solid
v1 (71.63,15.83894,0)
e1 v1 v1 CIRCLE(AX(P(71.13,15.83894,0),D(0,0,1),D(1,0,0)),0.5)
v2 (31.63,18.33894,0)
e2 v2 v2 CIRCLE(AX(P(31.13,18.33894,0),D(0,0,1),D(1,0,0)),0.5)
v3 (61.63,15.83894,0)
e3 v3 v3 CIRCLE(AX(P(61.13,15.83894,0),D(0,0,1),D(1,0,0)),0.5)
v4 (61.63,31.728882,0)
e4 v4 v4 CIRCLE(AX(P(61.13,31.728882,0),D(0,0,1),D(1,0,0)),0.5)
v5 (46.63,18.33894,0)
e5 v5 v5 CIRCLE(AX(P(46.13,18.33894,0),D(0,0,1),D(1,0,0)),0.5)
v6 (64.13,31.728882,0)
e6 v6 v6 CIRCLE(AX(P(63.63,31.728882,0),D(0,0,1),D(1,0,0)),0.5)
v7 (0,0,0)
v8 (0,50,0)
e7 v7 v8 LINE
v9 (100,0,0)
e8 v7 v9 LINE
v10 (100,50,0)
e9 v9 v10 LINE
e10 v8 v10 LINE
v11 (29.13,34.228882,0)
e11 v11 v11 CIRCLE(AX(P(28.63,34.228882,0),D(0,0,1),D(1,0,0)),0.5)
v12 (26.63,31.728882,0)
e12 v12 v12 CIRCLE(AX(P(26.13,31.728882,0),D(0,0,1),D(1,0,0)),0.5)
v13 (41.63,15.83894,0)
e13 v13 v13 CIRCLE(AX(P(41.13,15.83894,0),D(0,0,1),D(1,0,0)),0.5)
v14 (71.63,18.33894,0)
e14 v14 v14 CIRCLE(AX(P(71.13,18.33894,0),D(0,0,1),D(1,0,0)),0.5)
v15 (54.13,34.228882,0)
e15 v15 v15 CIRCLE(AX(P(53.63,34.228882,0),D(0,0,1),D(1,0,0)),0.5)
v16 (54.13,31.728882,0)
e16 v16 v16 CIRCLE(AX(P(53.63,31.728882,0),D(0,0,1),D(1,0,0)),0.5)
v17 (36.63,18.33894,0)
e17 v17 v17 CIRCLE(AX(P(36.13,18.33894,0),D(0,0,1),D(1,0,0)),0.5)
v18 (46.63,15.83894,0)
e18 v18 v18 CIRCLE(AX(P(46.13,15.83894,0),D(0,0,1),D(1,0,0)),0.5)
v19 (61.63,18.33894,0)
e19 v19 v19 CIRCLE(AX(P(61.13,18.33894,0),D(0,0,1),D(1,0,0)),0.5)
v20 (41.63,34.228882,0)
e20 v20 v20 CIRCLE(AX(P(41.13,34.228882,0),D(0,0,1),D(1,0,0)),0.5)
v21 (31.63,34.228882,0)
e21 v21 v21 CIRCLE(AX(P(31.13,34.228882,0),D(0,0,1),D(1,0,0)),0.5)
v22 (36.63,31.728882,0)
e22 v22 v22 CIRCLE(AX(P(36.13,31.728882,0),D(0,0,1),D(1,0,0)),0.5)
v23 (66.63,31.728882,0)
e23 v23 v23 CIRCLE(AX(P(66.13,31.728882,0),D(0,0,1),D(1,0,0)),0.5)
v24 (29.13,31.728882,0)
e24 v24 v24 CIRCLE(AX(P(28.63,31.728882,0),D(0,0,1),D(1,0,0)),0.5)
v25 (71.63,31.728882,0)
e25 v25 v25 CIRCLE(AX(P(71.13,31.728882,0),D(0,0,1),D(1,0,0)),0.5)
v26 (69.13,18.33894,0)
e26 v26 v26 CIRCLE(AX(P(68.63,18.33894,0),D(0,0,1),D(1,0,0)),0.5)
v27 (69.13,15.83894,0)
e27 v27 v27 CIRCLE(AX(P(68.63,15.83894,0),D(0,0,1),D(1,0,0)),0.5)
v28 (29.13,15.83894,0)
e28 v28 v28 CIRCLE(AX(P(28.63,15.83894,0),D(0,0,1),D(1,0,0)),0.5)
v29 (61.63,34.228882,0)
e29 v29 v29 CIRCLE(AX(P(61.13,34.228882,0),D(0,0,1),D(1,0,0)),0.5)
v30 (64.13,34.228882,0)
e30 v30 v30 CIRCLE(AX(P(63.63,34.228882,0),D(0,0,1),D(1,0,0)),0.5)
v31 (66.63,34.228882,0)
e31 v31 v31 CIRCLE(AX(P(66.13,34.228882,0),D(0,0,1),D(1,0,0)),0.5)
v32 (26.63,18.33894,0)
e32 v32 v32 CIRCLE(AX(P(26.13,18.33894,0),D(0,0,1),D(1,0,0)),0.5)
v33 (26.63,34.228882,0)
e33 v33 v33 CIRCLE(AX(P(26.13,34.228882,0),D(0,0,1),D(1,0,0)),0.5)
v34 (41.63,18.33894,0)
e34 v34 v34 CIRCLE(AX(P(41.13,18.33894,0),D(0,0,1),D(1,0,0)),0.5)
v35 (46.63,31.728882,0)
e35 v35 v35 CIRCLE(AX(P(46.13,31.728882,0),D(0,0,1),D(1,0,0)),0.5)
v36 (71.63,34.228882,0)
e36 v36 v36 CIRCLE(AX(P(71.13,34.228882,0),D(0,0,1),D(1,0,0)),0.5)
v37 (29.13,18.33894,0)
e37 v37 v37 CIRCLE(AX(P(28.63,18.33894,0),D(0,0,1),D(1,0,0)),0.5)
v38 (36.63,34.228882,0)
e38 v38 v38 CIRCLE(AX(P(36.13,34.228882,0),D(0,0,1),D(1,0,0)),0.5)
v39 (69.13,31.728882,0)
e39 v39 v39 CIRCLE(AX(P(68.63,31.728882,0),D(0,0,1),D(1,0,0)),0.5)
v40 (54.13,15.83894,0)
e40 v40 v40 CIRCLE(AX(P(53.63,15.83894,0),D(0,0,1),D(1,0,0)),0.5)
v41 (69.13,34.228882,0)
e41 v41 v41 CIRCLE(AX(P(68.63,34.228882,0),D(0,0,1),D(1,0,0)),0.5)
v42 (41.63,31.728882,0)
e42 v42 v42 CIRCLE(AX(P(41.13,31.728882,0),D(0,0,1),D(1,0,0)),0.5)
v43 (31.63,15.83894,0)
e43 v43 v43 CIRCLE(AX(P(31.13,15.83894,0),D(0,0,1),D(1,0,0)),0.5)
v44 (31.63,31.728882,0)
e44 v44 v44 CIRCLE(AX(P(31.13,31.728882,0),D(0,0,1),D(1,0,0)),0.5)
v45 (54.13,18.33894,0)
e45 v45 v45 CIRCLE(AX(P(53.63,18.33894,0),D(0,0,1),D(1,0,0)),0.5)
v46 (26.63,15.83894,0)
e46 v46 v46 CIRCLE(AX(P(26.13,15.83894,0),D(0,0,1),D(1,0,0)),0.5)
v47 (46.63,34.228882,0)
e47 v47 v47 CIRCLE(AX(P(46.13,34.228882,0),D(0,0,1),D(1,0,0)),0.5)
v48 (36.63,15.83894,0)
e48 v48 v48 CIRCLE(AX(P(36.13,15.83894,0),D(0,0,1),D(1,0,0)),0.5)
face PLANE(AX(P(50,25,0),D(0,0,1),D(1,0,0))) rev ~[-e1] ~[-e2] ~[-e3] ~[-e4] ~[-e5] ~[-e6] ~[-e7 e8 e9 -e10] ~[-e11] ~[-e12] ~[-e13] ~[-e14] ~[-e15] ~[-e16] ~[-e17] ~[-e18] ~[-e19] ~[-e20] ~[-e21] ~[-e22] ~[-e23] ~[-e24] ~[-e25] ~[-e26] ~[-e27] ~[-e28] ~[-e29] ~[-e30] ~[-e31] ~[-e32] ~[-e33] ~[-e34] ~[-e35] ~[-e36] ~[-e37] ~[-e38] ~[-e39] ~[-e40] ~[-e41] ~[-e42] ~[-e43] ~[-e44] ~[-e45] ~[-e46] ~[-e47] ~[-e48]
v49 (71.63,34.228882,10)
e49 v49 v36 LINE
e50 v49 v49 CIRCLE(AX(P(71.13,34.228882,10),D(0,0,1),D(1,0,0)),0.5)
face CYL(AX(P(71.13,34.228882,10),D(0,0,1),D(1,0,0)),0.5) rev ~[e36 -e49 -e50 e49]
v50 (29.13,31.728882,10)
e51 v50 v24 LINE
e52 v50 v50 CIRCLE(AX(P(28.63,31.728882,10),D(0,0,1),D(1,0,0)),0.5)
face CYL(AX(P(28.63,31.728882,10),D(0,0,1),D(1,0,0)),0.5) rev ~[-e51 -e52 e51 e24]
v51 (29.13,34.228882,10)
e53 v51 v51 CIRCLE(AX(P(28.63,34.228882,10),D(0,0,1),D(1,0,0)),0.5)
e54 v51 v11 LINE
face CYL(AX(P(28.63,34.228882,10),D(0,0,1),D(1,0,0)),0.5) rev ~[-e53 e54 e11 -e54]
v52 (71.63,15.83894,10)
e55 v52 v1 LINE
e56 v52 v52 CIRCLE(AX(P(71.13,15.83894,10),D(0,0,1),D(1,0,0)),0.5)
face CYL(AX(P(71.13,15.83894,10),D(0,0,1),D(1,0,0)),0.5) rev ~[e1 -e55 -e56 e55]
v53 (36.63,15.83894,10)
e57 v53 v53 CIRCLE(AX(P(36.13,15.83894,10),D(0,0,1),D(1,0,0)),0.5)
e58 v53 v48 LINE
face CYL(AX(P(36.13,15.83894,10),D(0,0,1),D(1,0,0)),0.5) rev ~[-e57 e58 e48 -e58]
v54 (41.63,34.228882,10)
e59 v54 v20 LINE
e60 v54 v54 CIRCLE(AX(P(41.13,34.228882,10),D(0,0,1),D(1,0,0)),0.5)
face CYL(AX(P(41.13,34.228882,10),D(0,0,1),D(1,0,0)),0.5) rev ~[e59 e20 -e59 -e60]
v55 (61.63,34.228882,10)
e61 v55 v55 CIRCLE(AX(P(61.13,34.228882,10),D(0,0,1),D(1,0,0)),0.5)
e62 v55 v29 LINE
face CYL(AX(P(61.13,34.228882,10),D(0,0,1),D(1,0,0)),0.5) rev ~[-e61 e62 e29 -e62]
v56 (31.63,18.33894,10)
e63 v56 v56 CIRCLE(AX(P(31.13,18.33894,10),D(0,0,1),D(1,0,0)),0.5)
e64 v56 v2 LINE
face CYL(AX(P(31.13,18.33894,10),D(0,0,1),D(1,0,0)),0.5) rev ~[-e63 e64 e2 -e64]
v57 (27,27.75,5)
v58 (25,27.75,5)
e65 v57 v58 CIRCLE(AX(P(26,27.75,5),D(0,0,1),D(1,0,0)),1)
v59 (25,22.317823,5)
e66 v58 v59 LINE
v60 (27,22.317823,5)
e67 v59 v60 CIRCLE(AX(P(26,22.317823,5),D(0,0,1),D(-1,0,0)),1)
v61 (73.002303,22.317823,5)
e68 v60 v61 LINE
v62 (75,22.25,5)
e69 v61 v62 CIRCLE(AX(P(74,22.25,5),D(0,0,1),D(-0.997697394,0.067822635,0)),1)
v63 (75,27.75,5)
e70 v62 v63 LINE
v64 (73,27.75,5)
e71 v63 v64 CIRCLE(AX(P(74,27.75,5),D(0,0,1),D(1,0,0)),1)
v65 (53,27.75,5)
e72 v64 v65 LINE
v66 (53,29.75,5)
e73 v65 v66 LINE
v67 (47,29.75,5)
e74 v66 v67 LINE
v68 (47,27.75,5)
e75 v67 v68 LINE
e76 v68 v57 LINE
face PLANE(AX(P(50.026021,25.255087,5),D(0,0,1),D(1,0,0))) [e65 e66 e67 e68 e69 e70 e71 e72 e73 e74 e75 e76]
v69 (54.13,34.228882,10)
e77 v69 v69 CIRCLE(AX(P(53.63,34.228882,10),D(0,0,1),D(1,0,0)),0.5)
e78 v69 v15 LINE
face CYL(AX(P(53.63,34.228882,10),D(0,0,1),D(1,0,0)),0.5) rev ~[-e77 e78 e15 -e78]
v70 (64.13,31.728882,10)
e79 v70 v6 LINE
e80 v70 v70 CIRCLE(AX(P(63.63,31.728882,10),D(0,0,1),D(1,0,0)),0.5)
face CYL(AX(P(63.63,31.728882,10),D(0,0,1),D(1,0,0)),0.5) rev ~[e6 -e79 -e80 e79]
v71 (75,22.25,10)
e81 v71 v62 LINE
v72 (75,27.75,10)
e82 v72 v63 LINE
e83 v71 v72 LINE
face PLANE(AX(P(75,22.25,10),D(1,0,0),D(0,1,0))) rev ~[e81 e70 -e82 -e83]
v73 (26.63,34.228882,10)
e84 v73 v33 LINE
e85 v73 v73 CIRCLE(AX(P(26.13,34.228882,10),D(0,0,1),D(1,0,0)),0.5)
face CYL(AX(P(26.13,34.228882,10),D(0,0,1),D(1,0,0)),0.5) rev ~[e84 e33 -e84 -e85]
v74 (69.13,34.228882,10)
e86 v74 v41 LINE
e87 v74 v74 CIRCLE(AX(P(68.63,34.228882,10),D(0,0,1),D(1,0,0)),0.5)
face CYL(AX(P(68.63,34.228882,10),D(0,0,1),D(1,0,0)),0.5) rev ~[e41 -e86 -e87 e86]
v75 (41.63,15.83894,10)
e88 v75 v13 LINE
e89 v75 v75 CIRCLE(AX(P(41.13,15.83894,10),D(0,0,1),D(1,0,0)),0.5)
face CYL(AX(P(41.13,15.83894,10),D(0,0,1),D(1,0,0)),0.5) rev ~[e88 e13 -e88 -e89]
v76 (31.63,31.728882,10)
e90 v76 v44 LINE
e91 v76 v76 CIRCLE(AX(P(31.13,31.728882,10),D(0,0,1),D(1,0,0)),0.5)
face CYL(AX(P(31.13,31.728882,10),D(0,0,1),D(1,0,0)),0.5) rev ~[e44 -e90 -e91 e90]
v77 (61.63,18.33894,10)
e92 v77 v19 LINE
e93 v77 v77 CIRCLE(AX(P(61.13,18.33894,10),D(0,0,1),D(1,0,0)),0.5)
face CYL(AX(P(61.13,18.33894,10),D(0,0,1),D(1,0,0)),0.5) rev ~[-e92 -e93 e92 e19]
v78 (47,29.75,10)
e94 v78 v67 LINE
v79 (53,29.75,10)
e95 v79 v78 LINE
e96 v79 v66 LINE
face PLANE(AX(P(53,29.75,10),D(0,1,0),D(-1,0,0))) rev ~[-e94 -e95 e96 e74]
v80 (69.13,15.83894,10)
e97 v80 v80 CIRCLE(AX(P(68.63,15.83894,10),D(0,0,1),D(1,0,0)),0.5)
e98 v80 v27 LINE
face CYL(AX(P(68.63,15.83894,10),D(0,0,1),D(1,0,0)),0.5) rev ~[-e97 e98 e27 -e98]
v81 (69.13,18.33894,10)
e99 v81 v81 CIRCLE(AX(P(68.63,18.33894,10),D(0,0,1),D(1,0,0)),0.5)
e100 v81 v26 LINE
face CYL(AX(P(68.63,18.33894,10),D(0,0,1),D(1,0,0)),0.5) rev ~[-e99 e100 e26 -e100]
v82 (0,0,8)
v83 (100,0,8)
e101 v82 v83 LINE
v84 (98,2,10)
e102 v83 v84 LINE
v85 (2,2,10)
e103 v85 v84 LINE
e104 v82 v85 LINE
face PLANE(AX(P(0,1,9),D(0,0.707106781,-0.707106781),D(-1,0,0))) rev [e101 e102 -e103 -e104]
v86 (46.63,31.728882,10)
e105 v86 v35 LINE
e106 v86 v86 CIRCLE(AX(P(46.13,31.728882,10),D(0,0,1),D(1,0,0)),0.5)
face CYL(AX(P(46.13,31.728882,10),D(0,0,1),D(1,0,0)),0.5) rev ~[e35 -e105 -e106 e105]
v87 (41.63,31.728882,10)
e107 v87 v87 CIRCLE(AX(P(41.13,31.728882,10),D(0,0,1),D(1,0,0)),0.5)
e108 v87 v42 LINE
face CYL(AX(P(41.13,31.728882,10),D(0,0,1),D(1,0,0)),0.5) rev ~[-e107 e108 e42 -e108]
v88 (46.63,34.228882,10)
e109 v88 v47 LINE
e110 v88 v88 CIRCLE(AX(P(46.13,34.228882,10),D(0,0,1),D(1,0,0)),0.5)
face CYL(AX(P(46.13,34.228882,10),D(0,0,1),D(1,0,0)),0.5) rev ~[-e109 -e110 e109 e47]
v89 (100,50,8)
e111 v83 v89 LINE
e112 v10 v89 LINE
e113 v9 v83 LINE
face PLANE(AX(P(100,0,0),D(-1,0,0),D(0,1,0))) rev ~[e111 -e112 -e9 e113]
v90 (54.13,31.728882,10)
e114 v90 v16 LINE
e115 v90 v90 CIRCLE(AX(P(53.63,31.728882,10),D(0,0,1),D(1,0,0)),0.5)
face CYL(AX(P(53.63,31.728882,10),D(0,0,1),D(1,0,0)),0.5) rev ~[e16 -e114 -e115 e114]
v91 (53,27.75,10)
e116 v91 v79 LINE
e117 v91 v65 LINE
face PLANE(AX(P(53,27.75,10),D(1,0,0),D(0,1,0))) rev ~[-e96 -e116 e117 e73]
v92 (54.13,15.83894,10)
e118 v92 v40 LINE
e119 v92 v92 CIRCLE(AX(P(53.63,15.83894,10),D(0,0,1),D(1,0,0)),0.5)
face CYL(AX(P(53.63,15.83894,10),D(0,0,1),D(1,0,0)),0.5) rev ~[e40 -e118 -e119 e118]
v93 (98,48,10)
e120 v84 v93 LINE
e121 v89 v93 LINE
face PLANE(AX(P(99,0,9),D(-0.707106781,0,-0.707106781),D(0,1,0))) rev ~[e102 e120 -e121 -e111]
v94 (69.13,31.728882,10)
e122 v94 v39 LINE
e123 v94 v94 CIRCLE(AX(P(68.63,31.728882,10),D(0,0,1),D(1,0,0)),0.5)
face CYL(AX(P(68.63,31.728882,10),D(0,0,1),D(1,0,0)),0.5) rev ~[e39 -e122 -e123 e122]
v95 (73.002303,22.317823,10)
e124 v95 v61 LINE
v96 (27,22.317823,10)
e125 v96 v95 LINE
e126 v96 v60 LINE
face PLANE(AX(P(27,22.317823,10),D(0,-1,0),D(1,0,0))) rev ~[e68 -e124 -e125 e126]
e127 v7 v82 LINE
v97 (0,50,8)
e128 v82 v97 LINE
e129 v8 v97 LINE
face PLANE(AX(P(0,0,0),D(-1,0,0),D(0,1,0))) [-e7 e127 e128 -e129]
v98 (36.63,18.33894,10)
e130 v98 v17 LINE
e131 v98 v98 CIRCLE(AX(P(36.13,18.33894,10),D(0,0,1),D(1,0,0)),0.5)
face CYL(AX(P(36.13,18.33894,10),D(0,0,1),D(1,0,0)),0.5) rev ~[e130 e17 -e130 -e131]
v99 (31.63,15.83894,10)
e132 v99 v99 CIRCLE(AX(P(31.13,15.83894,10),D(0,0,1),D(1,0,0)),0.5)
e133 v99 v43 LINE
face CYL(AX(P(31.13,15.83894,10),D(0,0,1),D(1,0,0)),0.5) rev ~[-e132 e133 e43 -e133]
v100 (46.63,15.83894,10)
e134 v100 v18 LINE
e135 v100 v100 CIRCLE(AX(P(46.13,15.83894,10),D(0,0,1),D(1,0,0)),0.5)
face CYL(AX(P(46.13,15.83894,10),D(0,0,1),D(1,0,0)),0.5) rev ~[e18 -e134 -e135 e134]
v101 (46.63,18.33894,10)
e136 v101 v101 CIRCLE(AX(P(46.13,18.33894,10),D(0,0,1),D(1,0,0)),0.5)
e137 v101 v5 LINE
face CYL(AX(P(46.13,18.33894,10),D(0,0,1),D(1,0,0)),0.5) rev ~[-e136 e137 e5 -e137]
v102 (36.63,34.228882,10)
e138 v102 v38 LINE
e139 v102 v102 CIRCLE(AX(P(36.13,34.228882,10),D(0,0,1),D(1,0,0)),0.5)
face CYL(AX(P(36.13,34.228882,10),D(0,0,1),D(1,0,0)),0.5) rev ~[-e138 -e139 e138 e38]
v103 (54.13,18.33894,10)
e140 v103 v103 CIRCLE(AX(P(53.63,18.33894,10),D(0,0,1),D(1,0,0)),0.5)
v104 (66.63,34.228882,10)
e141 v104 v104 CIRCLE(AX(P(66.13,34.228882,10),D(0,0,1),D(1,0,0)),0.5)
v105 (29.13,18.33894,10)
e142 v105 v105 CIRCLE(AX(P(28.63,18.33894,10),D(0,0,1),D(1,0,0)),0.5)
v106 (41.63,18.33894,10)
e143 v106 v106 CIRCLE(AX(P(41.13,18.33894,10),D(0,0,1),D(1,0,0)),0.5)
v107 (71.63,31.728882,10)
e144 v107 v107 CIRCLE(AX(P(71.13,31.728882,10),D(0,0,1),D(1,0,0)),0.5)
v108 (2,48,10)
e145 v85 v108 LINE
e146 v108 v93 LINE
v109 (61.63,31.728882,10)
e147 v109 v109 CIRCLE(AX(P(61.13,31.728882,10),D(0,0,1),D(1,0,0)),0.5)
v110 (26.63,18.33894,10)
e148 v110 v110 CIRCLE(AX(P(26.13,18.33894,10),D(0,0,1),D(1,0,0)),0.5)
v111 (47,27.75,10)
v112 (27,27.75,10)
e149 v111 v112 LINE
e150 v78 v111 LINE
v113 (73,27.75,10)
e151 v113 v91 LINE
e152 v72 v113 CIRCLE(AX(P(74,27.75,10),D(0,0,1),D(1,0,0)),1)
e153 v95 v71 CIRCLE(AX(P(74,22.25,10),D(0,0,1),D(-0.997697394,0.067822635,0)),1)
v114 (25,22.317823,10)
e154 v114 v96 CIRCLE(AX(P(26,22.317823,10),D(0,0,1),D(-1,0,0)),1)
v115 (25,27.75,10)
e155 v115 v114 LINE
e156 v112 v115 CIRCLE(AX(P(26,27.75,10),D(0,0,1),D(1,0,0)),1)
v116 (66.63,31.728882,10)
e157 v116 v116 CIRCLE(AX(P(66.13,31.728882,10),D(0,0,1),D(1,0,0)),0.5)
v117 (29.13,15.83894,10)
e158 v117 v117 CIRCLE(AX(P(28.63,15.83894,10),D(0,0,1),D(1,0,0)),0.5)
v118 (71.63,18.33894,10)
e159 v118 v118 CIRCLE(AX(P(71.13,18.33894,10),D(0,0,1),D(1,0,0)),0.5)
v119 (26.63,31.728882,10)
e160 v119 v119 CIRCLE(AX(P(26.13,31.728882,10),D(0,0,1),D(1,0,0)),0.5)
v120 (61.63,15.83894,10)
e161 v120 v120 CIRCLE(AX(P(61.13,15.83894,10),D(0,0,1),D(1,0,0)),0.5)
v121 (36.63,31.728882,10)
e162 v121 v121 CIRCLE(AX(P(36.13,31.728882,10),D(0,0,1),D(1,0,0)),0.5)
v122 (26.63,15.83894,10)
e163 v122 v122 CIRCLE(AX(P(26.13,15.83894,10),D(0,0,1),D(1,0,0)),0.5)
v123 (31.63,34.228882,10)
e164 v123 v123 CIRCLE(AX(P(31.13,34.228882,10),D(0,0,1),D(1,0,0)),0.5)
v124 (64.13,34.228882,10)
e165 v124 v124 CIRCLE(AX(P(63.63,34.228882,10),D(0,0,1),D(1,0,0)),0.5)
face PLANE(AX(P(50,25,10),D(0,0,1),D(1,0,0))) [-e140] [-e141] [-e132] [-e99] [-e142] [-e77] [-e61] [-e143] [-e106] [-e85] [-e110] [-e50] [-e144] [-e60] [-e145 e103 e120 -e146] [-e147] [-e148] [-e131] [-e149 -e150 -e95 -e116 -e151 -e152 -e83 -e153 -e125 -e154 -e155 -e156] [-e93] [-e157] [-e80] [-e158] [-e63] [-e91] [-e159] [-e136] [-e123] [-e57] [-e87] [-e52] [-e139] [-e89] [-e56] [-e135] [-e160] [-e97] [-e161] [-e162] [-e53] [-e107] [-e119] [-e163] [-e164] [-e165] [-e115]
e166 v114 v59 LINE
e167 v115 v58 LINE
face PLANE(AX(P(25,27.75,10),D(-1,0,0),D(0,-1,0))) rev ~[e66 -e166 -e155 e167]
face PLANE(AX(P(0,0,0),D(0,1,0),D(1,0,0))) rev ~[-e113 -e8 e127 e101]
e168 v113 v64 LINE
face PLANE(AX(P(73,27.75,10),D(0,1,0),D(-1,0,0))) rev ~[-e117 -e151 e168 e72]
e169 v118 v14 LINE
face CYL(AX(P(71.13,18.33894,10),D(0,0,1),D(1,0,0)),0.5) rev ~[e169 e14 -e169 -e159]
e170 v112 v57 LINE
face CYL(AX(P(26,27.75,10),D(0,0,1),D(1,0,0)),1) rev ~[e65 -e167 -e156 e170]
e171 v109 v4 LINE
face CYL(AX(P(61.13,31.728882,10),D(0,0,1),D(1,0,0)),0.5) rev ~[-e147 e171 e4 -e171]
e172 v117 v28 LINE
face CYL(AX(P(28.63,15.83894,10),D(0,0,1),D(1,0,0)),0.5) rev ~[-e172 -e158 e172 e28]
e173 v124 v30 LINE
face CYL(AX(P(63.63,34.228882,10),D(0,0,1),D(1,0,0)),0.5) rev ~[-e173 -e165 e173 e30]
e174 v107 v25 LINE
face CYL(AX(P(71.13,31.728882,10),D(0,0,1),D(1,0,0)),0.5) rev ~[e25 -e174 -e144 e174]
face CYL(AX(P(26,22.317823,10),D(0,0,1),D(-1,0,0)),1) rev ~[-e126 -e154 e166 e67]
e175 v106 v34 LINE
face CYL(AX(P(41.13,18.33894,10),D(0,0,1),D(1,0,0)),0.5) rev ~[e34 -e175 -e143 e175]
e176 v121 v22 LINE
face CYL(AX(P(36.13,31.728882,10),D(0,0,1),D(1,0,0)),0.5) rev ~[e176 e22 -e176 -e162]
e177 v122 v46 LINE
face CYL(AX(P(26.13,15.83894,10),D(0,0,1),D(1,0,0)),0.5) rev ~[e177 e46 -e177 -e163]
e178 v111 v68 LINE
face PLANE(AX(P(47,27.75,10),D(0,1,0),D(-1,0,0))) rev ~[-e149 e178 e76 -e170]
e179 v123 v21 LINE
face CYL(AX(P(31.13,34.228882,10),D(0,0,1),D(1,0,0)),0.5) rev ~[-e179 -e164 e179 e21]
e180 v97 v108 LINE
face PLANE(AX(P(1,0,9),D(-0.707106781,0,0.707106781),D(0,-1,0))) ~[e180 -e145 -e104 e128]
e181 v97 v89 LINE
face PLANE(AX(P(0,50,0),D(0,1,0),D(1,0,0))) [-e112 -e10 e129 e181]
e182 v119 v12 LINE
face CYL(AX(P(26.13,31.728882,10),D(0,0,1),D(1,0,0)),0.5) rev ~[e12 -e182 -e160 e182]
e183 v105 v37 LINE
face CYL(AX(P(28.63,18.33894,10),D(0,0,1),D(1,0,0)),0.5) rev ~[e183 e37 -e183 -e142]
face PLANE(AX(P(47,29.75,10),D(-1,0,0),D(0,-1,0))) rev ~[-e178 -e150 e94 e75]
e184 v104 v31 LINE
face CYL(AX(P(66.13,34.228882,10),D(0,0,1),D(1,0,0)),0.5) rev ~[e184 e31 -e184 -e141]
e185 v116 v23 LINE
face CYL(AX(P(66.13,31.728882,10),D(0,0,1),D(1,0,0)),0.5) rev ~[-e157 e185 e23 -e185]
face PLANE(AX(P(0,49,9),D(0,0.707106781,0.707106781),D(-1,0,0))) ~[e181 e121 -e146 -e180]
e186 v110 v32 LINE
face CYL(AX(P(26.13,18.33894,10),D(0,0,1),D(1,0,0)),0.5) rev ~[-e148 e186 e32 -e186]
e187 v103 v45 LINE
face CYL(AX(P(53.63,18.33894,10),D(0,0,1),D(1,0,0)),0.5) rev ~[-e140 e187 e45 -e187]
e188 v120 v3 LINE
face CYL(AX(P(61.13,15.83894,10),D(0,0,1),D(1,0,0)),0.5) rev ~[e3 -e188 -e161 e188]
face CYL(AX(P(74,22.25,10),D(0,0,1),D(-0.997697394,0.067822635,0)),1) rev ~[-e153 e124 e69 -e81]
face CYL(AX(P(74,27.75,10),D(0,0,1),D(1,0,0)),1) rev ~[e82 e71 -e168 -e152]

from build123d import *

# Parameters (mm, degrees)
F0_W     = 100
F0_H     = 50
F1_DEPTH = 10
F3_DEPTH = 5
F4_R     = 0.5
F5_DEPTH = 10.001
F6_SIZE  = 2


# Not quite as in the source:
# - a feature names something its author has since deleted; it is built from what else it names


with BuildPart() as f1:
    # F0 (on Top) → F1 (new body)
    with BuildSketch(Plane.XY):
        with Locations((50, 25)):
            Rectangle(F0_W, F0_H)
    extrude(amount=F1_DEPTH)

    # F2 (on face) → F3 (cut)
    with BuildSketch(Plane.XY.offset(10)):
        with BuildLine():
            ThreePointArc((25, 22.3178226352), (26, 21.3178226352), (27, 22.3178226352))
            Line((27, 22.3178226352), (73.0023026059, 22.3178226352))
            ThreePointArc((73.0023026059, 22.3178226352), (73.9660691444, 21.2505758173), (75, 22.25))
            Line((75, 22.25), (75, 27.75))
            ThreePointArc((75, 27.75), (74, 28.75), (73, 27.75))
            Line((73, 27.75), (53, 27.75))
            Line((53, 27.75), (53, 29.75))
            Line((53, 29.75), (47, 29.75))
            Line((47, 29.75), (47, 27.75))
            Line((47, 27.75), (27, 27.75))
            ThreePointArc((27, 27.75), (26, 28.75), (25, 27.75))
            Line((25, 27.75), (25, 22.3178226352))
        make_face()
    extrude(amount=-F3_DEPTH, mode=Mode.SUBTRACT)

    # F4 (on face) → F5 (cut, through all)
    with BuildSketch(Plane.XY.offset(10)):
        with Locations((26.13, 31.7288823426)):
            Circle(F4_R)
        with Locations((28.63, 31.7288823426)):
            Circle(F4_R)
        with Locations((31.13, 31.7288823426)):
            Circle(F4_R)
        with Locations((36.13, 31.7288823426)):
            Circle(F4_R)
        with Locations((41.13, 31.7288823426)):
            Circle(F4_R)
        with Locations((46.13, 31.7288823426)):
            Circle(F4_R)
        with Locations((53.63, 31.7288823426)):
            Circle(F4_R)
        with Locations((61.13, 31.7288823426)):
            Circle(F4_R)
        with Locations((63.63, 31.7288823426)):
            Circle(F4_R)
        with Locations((66.13, 31.7288823426)):
            Circle(F4_R)
        with Locations((68.63, 31.7288823426)):
            Circle(F4_R)
        with Locations((71.13, 31.7288823426)):
            Circle(F4_R)
        with Locations((71.13, 18.3389402926)):
            Circle(F4_R)
        with Locations((61.13, 18.3389402926)):
            Circle(F4_R)
        with Locations((26.13, 18.3389402926)):
            Circle(F4_R)
        with Locations((28.63, 18.3389402926)):
            Circle(F4_R)
        with Locations((31.13, 18.3389402926)):
            Circle(F4_R)
        with Locations((36.13, 18.3389402926)):
            Circle(F4_R)
        with Locations((41.13, 18.3389402926)):
            Circle(F4_R)
        with Locations((46.13, 18.3389402926)):
            Circle(F4_R)
        with Locations((53.63, 18.3389402926)):
            Circle(F4_R)
        with Locations((68.63, 18.3389402926)):
            Circle(F4_R)
        with Locations((26.13, 34.2288823426)):
            Circle(F4_R)
        with Locations((28.63, 34.2288823426)):
            Circle(F4_R)
        with Locations((31.13, 34.2288823426)):
            Circle(F4_R)
        with Locations((36.13, 34.2288823426)):
            Circle(F4_R)
        with Locations((41.13, 34.2288823426)):
            Circle(F4_R)
        with Locations((46.13, 34.2288823426)):
            Circle(F4_R)
        with Locations((53.63, 34.2288823426)):
            Circle(F4_R)
        with Locations((61.13, 34.2288823426)):
            Circle(F4_R)
        with Locations((63.63, 34.2288823426)):
            Circle(F4_R)
        with Locations((66.13, 34.2288823426)):
            Circle(F4_R)
        with Locations((68.63, 34.2288823426)):
            Circle(F4_R)
        with Locations((71.13, 34.2288823426)):
            Circle(F4_R)
        with Locations((41.13, 15.8389402926)):
            Circle(F4_R)
        with Locations((61.13, 15.8389402926)):
            Circle(F4_R)
        with Locations((36.13, 15.8389402926)):
            Circle(F4_R)
        with Locations((53.63, 15.8389402926)):
            Circle(F4_R)
        with Locations((46.13, 15.8389402926)):
            Circle(F4_R)
        with Locations((71.13, 15.8389402926)):
            Circle(F4_R)
        with Locations((31.13, 15.8389402926)):
            Circle(F4_R)
        with Locations((26.13, 15.8389402926)):
            Circle(F4_R)
        with Locations((68.63, 15.8389402926)):
            Circle(F4_R)
        with Locations((28.63, 15.8389402926)):
            Circle(F4_R)
    extrude(amount=-F5_DEPTH, mode=Mode.SUBTRACT)

    # F6
    f6_edges = [f1.edges().sort_by_distance(p)[0] for p in [
        (50, 0, 10),
        (0, 25, 10),
        (50, 50, 10),
        (100, 25, 10),
    ]]
    chamfer(f6_edges, length=F6_SIZE)


solid = f1.part
